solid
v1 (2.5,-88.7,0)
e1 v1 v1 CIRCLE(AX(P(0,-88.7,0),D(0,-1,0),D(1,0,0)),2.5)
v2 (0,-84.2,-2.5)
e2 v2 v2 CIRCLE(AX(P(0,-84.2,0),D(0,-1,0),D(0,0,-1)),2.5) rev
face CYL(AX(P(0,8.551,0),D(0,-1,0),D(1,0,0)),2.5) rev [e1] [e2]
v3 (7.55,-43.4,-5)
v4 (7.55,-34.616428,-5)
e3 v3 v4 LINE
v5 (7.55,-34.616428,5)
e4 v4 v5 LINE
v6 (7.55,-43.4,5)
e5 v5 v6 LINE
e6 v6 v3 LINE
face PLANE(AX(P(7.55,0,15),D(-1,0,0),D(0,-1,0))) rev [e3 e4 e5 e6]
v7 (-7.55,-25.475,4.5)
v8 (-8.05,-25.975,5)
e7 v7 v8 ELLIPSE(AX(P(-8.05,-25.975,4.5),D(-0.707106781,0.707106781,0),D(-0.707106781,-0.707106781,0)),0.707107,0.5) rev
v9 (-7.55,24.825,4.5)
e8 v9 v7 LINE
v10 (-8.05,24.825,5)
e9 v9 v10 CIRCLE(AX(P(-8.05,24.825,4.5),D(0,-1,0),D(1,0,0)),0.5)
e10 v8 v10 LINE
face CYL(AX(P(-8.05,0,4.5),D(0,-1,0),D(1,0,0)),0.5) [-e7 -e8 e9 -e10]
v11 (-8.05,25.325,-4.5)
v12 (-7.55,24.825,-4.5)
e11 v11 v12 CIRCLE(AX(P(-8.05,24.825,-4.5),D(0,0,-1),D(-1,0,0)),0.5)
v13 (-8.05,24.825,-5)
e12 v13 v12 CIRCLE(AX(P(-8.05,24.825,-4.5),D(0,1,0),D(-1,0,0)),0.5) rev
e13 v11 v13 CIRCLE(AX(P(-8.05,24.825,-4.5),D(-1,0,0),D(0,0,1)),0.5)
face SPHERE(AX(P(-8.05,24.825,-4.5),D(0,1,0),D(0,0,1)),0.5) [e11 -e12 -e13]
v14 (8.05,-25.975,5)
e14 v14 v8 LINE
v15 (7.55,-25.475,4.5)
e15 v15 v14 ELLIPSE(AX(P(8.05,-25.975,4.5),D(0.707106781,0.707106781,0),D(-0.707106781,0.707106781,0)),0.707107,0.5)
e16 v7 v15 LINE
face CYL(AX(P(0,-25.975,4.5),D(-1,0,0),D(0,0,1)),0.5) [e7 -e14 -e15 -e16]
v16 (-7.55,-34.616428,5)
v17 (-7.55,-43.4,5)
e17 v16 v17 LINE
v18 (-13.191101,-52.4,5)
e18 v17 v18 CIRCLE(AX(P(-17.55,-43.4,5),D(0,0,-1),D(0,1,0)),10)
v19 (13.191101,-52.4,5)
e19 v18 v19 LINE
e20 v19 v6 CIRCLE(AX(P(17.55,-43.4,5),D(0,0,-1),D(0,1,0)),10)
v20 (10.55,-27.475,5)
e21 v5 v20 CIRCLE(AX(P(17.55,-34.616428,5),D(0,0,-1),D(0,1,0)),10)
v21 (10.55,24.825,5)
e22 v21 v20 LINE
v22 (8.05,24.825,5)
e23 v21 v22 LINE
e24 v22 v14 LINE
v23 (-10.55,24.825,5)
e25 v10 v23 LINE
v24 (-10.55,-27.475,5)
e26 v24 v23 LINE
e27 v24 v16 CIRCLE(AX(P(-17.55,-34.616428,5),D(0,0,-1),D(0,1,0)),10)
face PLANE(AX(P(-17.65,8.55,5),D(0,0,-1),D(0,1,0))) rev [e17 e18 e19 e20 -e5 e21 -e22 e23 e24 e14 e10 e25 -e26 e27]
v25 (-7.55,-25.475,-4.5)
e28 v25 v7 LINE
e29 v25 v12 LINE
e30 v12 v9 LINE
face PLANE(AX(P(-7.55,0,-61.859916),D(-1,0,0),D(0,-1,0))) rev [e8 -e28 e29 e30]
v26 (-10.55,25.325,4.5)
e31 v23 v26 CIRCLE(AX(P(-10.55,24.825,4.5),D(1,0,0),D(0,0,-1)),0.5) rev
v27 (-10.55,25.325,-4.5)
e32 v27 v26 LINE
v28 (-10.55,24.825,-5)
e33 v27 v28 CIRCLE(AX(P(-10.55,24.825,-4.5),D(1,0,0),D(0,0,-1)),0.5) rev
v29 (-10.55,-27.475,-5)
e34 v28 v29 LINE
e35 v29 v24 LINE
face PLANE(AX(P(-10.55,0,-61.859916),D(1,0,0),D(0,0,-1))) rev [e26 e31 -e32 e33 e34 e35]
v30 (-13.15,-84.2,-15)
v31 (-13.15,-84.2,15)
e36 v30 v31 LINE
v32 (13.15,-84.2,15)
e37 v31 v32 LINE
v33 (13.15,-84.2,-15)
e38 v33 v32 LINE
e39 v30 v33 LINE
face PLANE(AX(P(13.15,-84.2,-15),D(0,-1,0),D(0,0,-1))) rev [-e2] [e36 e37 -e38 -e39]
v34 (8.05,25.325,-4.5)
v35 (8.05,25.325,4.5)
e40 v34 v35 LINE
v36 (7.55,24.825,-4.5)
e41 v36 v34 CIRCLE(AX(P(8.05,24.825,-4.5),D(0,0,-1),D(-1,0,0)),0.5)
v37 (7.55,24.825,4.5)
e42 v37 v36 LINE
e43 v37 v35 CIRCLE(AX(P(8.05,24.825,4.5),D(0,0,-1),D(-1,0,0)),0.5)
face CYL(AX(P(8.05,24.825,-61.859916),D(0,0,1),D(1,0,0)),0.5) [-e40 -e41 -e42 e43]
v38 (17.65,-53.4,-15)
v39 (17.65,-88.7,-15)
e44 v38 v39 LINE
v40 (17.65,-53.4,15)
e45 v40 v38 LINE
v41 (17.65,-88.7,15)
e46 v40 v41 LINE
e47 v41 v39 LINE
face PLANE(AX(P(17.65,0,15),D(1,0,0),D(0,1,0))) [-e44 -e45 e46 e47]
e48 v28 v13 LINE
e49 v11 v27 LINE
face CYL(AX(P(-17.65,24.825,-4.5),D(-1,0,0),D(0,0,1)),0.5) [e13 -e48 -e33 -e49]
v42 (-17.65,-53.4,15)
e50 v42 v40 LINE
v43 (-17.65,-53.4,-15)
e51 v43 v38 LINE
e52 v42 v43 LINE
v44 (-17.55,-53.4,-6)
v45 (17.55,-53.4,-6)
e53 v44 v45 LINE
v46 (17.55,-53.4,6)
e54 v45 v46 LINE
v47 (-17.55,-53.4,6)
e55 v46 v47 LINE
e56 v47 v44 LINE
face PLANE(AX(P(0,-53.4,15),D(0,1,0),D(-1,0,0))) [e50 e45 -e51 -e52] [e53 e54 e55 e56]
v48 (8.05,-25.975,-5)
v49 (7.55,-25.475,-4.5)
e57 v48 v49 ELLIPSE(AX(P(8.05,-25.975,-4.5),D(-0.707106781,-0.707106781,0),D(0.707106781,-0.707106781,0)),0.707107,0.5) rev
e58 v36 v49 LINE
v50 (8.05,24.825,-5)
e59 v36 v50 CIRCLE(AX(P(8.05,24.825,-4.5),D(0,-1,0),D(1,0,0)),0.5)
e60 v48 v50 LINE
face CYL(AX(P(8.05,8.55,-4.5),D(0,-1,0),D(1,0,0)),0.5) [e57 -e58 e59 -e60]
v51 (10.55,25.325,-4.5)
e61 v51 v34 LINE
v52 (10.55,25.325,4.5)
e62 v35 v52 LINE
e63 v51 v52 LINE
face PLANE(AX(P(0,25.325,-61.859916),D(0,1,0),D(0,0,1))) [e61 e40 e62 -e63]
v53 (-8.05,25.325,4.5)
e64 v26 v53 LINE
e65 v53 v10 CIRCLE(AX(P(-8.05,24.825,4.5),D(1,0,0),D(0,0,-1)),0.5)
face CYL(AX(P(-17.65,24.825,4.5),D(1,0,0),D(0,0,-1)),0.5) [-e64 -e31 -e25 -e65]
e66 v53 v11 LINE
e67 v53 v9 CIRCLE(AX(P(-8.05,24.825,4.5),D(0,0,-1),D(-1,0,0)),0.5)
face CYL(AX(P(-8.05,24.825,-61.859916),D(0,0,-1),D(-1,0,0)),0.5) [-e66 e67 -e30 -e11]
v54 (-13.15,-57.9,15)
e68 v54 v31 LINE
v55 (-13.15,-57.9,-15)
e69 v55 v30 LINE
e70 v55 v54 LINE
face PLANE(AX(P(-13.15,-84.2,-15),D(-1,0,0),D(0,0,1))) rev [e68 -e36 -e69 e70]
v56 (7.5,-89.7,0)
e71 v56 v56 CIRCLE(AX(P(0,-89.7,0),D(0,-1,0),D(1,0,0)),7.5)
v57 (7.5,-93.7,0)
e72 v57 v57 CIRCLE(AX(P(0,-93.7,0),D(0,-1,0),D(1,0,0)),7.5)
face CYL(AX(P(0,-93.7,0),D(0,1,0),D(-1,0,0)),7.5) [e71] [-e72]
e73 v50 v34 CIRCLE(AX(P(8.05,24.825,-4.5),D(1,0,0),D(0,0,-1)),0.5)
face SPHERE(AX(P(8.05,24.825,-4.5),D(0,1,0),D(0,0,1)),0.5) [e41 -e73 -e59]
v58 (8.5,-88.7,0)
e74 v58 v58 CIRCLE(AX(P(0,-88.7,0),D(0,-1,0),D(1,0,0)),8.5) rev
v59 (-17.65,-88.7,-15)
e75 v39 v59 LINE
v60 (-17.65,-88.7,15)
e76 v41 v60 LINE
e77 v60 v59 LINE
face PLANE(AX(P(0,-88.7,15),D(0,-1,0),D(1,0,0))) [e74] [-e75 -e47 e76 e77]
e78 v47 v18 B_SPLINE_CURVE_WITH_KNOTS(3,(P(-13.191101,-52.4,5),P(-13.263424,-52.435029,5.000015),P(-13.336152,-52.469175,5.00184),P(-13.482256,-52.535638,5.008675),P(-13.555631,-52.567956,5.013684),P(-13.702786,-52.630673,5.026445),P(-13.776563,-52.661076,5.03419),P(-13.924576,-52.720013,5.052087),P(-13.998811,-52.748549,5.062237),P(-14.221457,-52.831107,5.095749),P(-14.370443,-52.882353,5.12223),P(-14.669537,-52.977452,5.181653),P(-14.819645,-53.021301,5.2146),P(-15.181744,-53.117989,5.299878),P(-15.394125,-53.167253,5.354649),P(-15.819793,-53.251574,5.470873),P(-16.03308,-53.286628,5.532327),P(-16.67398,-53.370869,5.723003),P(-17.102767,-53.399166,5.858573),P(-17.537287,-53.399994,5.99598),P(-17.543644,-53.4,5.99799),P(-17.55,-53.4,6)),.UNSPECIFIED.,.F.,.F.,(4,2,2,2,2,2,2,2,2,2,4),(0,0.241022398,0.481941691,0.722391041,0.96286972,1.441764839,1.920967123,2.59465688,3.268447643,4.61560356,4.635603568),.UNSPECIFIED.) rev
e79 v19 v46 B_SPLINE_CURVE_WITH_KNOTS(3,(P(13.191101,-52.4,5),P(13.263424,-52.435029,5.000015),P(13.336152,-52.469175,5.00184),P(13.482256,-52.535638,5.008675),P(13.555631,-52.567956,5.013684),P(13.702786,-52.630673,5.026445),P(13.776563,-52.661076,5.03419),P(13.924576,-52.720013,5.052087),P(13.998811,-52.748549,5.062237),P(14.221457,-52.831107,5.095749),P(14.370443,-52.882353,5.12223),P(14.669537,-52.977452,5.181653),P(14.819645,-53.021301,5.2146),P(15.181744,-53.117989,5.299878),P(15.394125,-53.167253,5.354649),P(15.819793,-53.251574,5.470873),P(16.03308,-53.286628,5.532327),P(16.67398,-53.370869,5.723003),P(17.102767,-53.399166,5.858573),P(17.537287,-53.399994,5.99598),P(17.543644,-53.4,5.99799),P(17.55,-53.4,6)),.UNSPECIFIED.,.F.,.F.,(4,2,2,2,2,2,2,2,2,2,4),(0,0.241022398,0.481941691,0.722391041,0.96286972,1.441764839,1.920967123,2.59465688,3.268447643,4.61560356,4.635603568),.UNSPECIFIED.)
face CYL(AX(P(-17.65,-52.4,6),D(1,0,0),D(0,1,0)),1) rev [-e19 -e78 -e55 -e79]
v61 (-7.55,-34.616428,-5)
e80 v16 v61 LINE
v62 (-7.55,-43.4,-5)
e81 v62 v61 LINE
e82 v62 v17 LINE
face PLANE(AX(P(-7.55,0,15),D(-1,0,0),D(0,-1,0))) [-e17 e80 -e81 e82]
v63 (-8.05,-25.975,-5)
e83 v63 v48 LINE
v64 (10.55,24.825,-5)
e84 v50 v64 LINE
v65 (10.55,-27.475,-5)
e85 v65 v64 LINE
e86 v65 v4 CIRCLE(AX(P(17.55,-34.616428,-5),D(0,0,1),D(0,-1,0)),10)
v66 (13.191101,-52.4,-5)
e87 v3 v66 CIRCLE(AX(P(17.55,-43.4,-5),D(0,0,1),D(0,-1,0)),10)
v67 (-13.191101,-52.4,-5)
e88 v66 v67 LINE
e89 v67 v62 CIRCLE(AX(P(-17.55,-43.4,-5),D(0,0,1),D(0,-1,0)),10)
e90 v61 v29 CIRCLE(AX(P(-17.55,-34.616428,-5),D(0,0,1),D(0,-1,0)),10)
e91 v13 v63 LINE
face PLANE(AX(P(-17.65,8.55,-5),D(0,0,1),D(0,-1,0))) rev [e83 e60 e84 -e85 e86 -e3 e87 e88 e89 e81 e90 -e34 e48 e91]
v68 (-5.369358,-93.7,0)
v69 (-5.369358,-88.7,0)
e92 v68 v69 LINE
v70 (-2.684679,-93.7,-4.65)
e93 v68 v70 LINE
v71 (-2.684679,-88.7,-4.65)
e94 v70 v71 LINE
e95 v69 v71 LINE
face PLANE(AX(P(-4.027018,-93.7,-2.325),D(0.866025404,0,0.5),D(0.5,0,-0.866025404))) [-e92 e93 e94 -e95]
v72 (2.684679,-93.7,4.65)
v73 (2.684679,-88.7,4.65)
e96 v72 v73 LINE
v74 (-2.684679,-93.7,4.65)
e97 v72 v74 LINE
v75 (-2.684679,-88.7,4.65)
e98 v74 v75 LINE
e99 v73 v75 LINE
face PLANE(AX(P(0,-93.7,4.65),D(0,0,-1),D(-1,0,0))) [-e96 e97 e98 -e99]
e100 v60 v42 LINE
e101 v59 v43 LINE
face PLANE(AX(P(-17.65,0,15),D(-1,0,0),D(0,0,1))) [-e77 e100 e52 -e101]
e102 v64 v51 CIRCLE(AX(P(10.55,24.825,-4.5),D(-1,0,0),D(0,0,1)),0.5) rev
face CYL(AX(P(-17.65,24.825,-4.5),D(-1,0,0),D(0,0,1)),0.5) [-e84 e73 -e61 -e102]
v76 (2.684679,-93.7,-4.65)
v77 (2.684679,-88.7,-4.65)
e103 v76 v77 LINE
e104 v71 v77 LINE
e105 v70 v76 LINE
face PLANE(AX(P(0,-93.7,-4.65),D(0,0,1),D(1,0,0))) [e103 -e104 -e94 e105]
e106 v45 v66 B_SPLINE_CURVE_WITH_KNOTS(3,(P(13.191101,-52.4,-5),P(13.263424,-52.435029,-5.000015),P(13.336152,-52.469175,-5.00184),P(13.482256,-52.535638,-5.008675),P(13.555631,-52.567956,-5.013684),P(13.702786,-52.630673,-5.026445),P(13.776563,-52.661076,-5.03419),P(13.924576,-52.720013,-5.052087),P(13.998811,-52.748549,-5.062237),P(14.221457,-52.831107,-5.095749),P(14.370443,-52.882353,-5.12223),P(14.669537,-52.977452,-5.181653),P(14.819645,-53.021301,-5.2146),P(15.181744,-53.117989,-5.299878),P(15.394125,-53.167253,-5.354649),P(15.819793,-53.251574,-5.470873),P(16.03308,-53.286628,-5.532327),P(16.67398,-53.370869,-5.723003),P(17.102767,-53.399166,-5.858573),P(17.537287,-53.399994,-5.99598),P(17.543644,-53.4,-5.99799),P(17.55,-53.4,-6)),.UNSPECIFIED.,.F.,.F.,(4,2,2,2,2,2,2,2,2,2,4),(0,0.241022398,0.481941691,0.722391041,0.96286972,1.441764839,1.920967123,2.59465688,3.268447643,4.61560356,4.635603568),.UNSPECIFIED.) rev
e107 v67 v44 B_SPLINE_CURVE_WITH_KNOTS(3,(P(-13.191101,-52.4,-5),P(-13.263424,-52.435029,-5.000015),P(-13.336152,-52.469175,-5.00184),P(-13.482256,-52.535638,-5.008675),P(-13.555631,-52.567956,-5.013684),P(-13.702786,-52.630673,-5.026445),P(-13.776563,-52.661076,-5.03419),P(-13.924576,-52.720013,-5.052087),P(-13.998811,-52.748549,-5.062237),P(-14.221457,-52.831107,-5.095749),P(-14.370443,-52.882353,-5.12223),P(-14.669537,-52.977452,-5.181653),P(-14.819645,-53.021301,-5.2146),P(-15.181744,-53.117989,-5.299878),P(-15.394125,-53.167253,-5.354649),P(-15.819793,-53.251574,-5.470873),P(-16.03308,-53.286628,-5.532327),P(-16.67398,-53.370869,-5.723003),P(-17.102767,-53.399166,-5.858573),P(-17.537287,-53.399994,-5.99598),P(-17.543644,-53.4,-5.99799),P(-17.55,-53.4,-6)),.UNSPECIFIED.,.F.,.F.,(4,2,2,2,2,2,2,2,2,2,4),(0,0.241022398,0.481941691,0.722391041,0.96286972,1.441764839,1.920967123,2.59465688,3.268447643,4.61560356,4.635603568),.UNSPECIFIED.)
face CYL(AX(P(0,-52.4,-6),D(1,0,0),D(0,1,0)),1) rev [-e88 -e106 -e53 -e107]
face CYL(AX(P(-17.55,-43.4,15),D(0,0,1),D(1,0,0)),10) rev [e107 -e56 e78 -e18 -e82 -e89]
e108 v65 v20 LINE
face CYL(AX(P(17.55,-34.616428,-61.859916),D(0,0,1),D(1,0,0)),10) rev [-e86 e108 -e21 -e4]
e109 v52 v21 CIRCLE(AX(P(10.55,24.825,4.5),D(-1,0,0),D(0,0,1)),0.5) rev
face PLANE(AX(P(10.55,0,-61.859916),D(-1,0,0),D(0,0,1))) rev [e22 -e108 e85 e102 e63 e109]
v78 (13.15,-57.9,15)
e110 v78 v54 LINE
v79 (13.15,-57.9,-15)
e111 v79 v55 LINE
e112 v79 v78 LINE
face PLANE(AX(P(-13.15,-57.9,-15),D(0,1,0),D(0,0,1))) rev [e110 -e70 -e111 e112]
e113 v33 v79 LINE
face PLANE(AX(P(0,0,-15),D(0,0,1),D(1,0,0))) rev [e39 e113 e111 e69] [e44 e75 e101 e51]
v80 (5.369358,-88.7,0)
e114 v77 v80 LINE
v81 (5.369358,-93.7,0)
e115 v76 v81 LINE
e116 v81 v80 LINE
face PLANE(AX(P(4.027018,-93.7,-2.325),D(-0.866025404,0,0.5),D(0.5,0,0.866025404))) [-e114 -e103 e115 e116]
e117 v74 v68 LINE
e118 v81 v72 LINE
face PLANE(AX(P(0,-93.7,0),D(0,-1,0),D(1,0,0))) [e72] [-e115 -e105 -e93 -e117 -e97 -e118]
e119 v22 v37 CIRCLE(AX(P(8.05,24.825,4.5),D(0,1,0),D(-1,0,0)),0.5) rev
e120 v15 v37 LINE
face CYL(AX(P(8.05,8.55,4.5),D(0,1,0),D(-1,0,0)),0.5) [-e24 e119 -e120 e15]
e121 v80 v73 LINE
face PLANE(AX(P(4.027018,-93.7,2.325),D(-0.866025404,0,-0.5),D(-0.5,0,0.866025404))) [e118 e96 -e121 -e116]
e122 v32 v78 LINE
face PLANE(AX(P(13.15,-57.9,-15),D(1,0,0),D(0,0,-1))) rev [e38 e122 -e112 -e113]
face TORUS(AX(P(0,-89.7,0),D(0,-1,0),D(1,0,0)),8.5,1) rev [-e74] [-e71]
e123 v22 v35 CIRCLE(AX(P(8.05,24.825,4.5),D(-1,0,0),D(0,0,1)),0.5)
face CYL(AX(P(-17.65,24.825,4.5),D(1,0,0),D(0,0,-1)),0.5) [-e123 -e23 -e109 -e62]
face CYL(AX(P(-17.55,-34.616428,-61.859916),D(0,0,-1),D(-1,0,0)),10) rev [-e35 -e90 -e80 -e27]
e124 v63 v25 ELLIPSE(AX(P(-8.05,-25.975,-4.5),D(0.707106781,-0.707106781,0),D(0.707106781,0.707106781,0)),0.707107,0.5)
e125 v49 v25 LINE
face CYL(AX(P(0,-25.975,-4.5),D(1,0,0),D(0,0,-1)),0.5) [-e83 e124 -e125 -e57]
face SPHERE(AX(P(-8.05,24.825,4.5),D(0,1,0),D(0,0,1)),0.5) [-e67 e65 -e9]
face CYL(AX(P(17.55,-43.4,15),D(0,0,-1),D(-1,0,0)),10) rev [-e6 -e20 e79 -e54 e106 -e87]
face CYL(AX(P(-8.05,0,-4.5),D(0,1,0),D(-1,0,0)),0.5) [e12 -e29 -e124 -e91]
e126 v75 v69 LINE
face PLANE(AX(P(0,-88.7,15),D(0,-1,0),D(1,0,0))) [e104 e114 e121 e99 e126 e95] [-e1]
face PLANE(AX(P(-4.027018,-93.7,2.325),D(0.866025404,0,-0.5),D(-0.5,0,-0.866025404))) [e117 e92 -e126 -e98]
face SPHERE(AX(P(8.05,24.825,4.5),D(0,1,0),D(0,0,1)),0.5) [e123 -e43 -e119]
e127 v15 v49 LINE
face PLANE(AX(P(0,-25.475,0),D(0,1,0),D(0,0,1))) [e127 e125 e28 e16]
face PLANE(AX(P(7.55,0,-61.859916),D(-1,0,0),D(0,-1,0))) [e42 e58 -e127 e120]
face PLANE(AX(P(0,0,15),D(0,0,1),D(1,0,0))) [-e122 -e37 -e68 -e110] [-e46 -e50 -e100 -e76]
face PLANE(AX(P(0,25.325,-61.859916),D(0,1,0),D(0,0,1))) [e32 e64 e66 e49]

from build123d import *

# Parameters (mm, degrees)
SKETCH2_W               = 25.3
SKETCH2_H               = 25.3
BOSS_EXTRUDE1_DEPTH     = 15
CUT_EXTRUDE1_DEPTH      = 94.422320673
CUT_EXTRUDE1_DEPTH_BACK = 94.422320673
SKETCH3_W               = 10
SKETCH3_H               = 61.95
FILLET1_R               = 10
FILLET2_R               = 1
SKETCH4_R               = 7.5
BOSS_EXTRUDE2_DEPTH     = 5
FILLET3_R               = 1
CUT_EXTRUDE2_REACH      = 101.97
SKETCH5_R               = 2.5
BOSS_EXTRUDE3_DEPTH     = 10
FILLET4_R               = 10
SKETCH11_W              = 15.1
SKETCH11_H              = 10
CUT_EXTRUDE4_DEPTH      = 34.025
FILLET5_R               = 0.5
FILLET6_R               = 0.5
CUT_EXTRUDE5_DEPTH      = 100.956052843
CUT_EXTRUDE5_DEPTH_BACK = 100.956052843
SKETCH12_W              = 26.3
SKETCH12_H              = 26.3


with BuildPart() as part:
    # Sketch2 → Boss-Extrude1 (new, symmetric)
    with BuildSketch(Plane.XY):
        Polygon((-7.55, -53.4), (-7.55, 8.55), (7.55, 8.55), (7.55, -53.4), (17.65, -53.4), (17.65, -88.7), (-17.65, -88.7), (-17.65, -53.4), align=None)
        with Locations((0, -71.05)):
            Rectangle(SKETCH2_W, SKETCH2_H, mode=Mode.SUBTRACT)
    extrude(amount=BOSS_EXTRUDE1_DEPTH, both=True)

    # Sketch3 → Cut-Extrude1 (cut, two sides: drawn at the far end of the back side and taken through both)
    with BuildSketch(Plane(origin=(7.55, 0, 0), x_dir=(0, 0, -1), z_dir=(1, 0, 0)).offset(-CUT_EXTRUDE1_DEPTH_BACK)):
        with Locations((-10, -22.425)):
            Rectangle(SKETCH3_W, SKETCH3_H)
        with Locations((10, -22.425)):
            Rectangle(SKETCH3_W, SKETCH3_H)
    extrude(amount=CUT_EXTRUDE1_DEPTH + CUT_EXTRUDE1_DEPTH_BACK, mode=Mode.SUBTRACT)

    # Fillet1
    fillet1_edges = [part.edges().sort_by_distance(p)[0] for p in [
        (-7.55, -53.4, 0),
        (7.55, -53.4, 0),
    ]]
    fillet(fillet1_edges, radius=FILLET1_R)

    # Fillet2
    fillet2_edges = [part.edges().sort_by_distance(p)[0] for p in [
        (0, -53.4, 5),
        (0, -53.4, -5),
    ]]
    fillet(fillet2_edges, radius=FILLET2_R)

    # Sketch4 → Boss-Extrude2 (add)
    with BuildSketch(Plane.XZ.offset(88.7)):
        Circle(SKETCH4_R)
        Polygon((5.369357503, 0), (2.684678752, 4.65), (-2.684678752, 4.65), (-5.369357503, 0), (-2.684678752, -4.65), (2.684678752, -4.65), align=None, mode=Mode.SUBTRACT)
    extrude(amount=BOSS_EXTRUDE2_DEPTH)

    # Fillet3
    fillet3_edges = [part.edges().sort_by_distance(p)[0] for p in [
        (-7.5, -88.7, 0),
    ]]
    fillet(fillet3_edges, radius=FILLET3_R)

    # Sketch5 → Cut-Extrude2 (cut, up to next)
    with BuildSketch(Plane.XZ.offset(88.7), mode=Mode.PRIVATE) as cut_extrude2_sk1:
        Circle(SKETCH5_R)
    cut_extrude2_tool1 = extrude(cut_extrude2_sk1.sketch, amount=-CUT_EXTRUDE2_REACH, mode=Mode.PRIVATE) & part.part
    add(cut_extrude2_tool1.solids().sort_by_distance((0, -88.7, 0))[0], mode=Mode.SUBTRACT)

    # Sketch9 → Boss-Extrude3 (add)
    with BuildSketch(Plane.XY.offset(5)):
        Polygon((-10.55, -27.475), (-7.55, -27.475), (-7.55, -25.475), (-7.55, 8.55), (-7.55, 25.325), (-10.55, 25.325), (-10.55, -25.325), align=None)
        Polygon((10.55, 25.325), (7.55, 25.325), (7.55, 8.55), (7.55, -25.475), (7.55, -27.475), (10.55, -27.475), (10.55, -25.325), align=None)
        Polygon((7.55, -27.475), (7.55, -25.475), (7.4, -25.475), (-7.4, -25.475), (-7.55, -25.475), (-7.55, -27.475), align=None)
    extrude(amount=-BOSS_EXTRUDE3_DEPTH)

    # Fillet4
    # the kernel refuses this fillet: 10 mm, written as the material it adds along each edge
    with BuildSketch(Plane(origin=(-7.55, -27.475, 5), x_dir=(0, -1, 0), z_dir=(0, 0, -1)), Plane(origin=(7.55, -27.475, -5), x_dir=(0, -1, 0), z_dir=(0, 0, 1))) as fillet4_piece_1:
        with BuildLine():
            CenterArc((7.141428429, 10), FILLET4_R, 224.427004001, 45.572995999)
            Line((0, 3), (-0.142828569, 2.86))
            ThreePointArc((-0.142828569, 2.86), (-0.2, 1.5), (-0.2, 0))
            Line((-0.2, 0), (0, -0.2))
            Line((0, -0.2), (7.141428429, -0.2))
            Line((7.141428429, -0.2), (7.141428429, 0))
        make_face()
    extrude(amount=10)

    # Sketch11 → Cut-Extrude4 (cut)
    with BuildSketch(Plane(origin=(0, 8.55, 0), x_dir=(1, 0, 0), z_dir=(0, 1, 0))):
        Rectangle(SKETCH11_W, SKETCH11_H)
    extrude(amount=-CUT_EXTRUDE4_DEPTH, mode=Mode.SUBTRACT)

    # Fillet5
    fillet5_edges = [part.edges().sort_by_distance(p)[0] for p in [
        (7.55, -0.075, 5),
        (7.55, -0.075, -5),
        (-7.55, -0.075, 5),
        (-7.55, -0.075, -5),
        (0, -25.475, -5),
        (0, -25.475, 5),
    ]]
    fillet(fillet5_edges, radius=FILLET5_R)

    # Fillet6
    fillet6_edges = [part.edges().sort_by_distance(p)[0] for p in [
        (9.3, 25.325, 5),
        (-9.3, 25.325, -5),
        (9.3, 25.325, -5),
        (7.55, 25.325, 0),
        (7.696446609, 25.325, 4.853553391),
        (7.696446609, 25.325, -4.853553391),
        (-7.55, 25.325, 0),
        (-9.3, 25.325, 5),
        (-7.696446609, 25.325, 4.853553391),
        (-7.696446609, 25.325, -4.853553391),
    ]]
    fillet(fillet6_edges, radius=FILLET6_R)

    # Sketch12 → Cut-Extrude5 (cut, two sides: drawn at the far end of the back side and taken through both)
    with BuildSketch(Plane.XY.offset(15).offset(-CUT_EXTRUDE5_DEPTH_BACK)):
        with Locations((0, -71.05)):
            Rectangle(SKETCH12_W, SKETCH12_H)
    extrude(amount=CUT_EXTRUDE5_DEPTH + CUT_EXTRUDE5_DEPTH_BACK, mode=Mode.SUBTRACT)


solid = part.part
